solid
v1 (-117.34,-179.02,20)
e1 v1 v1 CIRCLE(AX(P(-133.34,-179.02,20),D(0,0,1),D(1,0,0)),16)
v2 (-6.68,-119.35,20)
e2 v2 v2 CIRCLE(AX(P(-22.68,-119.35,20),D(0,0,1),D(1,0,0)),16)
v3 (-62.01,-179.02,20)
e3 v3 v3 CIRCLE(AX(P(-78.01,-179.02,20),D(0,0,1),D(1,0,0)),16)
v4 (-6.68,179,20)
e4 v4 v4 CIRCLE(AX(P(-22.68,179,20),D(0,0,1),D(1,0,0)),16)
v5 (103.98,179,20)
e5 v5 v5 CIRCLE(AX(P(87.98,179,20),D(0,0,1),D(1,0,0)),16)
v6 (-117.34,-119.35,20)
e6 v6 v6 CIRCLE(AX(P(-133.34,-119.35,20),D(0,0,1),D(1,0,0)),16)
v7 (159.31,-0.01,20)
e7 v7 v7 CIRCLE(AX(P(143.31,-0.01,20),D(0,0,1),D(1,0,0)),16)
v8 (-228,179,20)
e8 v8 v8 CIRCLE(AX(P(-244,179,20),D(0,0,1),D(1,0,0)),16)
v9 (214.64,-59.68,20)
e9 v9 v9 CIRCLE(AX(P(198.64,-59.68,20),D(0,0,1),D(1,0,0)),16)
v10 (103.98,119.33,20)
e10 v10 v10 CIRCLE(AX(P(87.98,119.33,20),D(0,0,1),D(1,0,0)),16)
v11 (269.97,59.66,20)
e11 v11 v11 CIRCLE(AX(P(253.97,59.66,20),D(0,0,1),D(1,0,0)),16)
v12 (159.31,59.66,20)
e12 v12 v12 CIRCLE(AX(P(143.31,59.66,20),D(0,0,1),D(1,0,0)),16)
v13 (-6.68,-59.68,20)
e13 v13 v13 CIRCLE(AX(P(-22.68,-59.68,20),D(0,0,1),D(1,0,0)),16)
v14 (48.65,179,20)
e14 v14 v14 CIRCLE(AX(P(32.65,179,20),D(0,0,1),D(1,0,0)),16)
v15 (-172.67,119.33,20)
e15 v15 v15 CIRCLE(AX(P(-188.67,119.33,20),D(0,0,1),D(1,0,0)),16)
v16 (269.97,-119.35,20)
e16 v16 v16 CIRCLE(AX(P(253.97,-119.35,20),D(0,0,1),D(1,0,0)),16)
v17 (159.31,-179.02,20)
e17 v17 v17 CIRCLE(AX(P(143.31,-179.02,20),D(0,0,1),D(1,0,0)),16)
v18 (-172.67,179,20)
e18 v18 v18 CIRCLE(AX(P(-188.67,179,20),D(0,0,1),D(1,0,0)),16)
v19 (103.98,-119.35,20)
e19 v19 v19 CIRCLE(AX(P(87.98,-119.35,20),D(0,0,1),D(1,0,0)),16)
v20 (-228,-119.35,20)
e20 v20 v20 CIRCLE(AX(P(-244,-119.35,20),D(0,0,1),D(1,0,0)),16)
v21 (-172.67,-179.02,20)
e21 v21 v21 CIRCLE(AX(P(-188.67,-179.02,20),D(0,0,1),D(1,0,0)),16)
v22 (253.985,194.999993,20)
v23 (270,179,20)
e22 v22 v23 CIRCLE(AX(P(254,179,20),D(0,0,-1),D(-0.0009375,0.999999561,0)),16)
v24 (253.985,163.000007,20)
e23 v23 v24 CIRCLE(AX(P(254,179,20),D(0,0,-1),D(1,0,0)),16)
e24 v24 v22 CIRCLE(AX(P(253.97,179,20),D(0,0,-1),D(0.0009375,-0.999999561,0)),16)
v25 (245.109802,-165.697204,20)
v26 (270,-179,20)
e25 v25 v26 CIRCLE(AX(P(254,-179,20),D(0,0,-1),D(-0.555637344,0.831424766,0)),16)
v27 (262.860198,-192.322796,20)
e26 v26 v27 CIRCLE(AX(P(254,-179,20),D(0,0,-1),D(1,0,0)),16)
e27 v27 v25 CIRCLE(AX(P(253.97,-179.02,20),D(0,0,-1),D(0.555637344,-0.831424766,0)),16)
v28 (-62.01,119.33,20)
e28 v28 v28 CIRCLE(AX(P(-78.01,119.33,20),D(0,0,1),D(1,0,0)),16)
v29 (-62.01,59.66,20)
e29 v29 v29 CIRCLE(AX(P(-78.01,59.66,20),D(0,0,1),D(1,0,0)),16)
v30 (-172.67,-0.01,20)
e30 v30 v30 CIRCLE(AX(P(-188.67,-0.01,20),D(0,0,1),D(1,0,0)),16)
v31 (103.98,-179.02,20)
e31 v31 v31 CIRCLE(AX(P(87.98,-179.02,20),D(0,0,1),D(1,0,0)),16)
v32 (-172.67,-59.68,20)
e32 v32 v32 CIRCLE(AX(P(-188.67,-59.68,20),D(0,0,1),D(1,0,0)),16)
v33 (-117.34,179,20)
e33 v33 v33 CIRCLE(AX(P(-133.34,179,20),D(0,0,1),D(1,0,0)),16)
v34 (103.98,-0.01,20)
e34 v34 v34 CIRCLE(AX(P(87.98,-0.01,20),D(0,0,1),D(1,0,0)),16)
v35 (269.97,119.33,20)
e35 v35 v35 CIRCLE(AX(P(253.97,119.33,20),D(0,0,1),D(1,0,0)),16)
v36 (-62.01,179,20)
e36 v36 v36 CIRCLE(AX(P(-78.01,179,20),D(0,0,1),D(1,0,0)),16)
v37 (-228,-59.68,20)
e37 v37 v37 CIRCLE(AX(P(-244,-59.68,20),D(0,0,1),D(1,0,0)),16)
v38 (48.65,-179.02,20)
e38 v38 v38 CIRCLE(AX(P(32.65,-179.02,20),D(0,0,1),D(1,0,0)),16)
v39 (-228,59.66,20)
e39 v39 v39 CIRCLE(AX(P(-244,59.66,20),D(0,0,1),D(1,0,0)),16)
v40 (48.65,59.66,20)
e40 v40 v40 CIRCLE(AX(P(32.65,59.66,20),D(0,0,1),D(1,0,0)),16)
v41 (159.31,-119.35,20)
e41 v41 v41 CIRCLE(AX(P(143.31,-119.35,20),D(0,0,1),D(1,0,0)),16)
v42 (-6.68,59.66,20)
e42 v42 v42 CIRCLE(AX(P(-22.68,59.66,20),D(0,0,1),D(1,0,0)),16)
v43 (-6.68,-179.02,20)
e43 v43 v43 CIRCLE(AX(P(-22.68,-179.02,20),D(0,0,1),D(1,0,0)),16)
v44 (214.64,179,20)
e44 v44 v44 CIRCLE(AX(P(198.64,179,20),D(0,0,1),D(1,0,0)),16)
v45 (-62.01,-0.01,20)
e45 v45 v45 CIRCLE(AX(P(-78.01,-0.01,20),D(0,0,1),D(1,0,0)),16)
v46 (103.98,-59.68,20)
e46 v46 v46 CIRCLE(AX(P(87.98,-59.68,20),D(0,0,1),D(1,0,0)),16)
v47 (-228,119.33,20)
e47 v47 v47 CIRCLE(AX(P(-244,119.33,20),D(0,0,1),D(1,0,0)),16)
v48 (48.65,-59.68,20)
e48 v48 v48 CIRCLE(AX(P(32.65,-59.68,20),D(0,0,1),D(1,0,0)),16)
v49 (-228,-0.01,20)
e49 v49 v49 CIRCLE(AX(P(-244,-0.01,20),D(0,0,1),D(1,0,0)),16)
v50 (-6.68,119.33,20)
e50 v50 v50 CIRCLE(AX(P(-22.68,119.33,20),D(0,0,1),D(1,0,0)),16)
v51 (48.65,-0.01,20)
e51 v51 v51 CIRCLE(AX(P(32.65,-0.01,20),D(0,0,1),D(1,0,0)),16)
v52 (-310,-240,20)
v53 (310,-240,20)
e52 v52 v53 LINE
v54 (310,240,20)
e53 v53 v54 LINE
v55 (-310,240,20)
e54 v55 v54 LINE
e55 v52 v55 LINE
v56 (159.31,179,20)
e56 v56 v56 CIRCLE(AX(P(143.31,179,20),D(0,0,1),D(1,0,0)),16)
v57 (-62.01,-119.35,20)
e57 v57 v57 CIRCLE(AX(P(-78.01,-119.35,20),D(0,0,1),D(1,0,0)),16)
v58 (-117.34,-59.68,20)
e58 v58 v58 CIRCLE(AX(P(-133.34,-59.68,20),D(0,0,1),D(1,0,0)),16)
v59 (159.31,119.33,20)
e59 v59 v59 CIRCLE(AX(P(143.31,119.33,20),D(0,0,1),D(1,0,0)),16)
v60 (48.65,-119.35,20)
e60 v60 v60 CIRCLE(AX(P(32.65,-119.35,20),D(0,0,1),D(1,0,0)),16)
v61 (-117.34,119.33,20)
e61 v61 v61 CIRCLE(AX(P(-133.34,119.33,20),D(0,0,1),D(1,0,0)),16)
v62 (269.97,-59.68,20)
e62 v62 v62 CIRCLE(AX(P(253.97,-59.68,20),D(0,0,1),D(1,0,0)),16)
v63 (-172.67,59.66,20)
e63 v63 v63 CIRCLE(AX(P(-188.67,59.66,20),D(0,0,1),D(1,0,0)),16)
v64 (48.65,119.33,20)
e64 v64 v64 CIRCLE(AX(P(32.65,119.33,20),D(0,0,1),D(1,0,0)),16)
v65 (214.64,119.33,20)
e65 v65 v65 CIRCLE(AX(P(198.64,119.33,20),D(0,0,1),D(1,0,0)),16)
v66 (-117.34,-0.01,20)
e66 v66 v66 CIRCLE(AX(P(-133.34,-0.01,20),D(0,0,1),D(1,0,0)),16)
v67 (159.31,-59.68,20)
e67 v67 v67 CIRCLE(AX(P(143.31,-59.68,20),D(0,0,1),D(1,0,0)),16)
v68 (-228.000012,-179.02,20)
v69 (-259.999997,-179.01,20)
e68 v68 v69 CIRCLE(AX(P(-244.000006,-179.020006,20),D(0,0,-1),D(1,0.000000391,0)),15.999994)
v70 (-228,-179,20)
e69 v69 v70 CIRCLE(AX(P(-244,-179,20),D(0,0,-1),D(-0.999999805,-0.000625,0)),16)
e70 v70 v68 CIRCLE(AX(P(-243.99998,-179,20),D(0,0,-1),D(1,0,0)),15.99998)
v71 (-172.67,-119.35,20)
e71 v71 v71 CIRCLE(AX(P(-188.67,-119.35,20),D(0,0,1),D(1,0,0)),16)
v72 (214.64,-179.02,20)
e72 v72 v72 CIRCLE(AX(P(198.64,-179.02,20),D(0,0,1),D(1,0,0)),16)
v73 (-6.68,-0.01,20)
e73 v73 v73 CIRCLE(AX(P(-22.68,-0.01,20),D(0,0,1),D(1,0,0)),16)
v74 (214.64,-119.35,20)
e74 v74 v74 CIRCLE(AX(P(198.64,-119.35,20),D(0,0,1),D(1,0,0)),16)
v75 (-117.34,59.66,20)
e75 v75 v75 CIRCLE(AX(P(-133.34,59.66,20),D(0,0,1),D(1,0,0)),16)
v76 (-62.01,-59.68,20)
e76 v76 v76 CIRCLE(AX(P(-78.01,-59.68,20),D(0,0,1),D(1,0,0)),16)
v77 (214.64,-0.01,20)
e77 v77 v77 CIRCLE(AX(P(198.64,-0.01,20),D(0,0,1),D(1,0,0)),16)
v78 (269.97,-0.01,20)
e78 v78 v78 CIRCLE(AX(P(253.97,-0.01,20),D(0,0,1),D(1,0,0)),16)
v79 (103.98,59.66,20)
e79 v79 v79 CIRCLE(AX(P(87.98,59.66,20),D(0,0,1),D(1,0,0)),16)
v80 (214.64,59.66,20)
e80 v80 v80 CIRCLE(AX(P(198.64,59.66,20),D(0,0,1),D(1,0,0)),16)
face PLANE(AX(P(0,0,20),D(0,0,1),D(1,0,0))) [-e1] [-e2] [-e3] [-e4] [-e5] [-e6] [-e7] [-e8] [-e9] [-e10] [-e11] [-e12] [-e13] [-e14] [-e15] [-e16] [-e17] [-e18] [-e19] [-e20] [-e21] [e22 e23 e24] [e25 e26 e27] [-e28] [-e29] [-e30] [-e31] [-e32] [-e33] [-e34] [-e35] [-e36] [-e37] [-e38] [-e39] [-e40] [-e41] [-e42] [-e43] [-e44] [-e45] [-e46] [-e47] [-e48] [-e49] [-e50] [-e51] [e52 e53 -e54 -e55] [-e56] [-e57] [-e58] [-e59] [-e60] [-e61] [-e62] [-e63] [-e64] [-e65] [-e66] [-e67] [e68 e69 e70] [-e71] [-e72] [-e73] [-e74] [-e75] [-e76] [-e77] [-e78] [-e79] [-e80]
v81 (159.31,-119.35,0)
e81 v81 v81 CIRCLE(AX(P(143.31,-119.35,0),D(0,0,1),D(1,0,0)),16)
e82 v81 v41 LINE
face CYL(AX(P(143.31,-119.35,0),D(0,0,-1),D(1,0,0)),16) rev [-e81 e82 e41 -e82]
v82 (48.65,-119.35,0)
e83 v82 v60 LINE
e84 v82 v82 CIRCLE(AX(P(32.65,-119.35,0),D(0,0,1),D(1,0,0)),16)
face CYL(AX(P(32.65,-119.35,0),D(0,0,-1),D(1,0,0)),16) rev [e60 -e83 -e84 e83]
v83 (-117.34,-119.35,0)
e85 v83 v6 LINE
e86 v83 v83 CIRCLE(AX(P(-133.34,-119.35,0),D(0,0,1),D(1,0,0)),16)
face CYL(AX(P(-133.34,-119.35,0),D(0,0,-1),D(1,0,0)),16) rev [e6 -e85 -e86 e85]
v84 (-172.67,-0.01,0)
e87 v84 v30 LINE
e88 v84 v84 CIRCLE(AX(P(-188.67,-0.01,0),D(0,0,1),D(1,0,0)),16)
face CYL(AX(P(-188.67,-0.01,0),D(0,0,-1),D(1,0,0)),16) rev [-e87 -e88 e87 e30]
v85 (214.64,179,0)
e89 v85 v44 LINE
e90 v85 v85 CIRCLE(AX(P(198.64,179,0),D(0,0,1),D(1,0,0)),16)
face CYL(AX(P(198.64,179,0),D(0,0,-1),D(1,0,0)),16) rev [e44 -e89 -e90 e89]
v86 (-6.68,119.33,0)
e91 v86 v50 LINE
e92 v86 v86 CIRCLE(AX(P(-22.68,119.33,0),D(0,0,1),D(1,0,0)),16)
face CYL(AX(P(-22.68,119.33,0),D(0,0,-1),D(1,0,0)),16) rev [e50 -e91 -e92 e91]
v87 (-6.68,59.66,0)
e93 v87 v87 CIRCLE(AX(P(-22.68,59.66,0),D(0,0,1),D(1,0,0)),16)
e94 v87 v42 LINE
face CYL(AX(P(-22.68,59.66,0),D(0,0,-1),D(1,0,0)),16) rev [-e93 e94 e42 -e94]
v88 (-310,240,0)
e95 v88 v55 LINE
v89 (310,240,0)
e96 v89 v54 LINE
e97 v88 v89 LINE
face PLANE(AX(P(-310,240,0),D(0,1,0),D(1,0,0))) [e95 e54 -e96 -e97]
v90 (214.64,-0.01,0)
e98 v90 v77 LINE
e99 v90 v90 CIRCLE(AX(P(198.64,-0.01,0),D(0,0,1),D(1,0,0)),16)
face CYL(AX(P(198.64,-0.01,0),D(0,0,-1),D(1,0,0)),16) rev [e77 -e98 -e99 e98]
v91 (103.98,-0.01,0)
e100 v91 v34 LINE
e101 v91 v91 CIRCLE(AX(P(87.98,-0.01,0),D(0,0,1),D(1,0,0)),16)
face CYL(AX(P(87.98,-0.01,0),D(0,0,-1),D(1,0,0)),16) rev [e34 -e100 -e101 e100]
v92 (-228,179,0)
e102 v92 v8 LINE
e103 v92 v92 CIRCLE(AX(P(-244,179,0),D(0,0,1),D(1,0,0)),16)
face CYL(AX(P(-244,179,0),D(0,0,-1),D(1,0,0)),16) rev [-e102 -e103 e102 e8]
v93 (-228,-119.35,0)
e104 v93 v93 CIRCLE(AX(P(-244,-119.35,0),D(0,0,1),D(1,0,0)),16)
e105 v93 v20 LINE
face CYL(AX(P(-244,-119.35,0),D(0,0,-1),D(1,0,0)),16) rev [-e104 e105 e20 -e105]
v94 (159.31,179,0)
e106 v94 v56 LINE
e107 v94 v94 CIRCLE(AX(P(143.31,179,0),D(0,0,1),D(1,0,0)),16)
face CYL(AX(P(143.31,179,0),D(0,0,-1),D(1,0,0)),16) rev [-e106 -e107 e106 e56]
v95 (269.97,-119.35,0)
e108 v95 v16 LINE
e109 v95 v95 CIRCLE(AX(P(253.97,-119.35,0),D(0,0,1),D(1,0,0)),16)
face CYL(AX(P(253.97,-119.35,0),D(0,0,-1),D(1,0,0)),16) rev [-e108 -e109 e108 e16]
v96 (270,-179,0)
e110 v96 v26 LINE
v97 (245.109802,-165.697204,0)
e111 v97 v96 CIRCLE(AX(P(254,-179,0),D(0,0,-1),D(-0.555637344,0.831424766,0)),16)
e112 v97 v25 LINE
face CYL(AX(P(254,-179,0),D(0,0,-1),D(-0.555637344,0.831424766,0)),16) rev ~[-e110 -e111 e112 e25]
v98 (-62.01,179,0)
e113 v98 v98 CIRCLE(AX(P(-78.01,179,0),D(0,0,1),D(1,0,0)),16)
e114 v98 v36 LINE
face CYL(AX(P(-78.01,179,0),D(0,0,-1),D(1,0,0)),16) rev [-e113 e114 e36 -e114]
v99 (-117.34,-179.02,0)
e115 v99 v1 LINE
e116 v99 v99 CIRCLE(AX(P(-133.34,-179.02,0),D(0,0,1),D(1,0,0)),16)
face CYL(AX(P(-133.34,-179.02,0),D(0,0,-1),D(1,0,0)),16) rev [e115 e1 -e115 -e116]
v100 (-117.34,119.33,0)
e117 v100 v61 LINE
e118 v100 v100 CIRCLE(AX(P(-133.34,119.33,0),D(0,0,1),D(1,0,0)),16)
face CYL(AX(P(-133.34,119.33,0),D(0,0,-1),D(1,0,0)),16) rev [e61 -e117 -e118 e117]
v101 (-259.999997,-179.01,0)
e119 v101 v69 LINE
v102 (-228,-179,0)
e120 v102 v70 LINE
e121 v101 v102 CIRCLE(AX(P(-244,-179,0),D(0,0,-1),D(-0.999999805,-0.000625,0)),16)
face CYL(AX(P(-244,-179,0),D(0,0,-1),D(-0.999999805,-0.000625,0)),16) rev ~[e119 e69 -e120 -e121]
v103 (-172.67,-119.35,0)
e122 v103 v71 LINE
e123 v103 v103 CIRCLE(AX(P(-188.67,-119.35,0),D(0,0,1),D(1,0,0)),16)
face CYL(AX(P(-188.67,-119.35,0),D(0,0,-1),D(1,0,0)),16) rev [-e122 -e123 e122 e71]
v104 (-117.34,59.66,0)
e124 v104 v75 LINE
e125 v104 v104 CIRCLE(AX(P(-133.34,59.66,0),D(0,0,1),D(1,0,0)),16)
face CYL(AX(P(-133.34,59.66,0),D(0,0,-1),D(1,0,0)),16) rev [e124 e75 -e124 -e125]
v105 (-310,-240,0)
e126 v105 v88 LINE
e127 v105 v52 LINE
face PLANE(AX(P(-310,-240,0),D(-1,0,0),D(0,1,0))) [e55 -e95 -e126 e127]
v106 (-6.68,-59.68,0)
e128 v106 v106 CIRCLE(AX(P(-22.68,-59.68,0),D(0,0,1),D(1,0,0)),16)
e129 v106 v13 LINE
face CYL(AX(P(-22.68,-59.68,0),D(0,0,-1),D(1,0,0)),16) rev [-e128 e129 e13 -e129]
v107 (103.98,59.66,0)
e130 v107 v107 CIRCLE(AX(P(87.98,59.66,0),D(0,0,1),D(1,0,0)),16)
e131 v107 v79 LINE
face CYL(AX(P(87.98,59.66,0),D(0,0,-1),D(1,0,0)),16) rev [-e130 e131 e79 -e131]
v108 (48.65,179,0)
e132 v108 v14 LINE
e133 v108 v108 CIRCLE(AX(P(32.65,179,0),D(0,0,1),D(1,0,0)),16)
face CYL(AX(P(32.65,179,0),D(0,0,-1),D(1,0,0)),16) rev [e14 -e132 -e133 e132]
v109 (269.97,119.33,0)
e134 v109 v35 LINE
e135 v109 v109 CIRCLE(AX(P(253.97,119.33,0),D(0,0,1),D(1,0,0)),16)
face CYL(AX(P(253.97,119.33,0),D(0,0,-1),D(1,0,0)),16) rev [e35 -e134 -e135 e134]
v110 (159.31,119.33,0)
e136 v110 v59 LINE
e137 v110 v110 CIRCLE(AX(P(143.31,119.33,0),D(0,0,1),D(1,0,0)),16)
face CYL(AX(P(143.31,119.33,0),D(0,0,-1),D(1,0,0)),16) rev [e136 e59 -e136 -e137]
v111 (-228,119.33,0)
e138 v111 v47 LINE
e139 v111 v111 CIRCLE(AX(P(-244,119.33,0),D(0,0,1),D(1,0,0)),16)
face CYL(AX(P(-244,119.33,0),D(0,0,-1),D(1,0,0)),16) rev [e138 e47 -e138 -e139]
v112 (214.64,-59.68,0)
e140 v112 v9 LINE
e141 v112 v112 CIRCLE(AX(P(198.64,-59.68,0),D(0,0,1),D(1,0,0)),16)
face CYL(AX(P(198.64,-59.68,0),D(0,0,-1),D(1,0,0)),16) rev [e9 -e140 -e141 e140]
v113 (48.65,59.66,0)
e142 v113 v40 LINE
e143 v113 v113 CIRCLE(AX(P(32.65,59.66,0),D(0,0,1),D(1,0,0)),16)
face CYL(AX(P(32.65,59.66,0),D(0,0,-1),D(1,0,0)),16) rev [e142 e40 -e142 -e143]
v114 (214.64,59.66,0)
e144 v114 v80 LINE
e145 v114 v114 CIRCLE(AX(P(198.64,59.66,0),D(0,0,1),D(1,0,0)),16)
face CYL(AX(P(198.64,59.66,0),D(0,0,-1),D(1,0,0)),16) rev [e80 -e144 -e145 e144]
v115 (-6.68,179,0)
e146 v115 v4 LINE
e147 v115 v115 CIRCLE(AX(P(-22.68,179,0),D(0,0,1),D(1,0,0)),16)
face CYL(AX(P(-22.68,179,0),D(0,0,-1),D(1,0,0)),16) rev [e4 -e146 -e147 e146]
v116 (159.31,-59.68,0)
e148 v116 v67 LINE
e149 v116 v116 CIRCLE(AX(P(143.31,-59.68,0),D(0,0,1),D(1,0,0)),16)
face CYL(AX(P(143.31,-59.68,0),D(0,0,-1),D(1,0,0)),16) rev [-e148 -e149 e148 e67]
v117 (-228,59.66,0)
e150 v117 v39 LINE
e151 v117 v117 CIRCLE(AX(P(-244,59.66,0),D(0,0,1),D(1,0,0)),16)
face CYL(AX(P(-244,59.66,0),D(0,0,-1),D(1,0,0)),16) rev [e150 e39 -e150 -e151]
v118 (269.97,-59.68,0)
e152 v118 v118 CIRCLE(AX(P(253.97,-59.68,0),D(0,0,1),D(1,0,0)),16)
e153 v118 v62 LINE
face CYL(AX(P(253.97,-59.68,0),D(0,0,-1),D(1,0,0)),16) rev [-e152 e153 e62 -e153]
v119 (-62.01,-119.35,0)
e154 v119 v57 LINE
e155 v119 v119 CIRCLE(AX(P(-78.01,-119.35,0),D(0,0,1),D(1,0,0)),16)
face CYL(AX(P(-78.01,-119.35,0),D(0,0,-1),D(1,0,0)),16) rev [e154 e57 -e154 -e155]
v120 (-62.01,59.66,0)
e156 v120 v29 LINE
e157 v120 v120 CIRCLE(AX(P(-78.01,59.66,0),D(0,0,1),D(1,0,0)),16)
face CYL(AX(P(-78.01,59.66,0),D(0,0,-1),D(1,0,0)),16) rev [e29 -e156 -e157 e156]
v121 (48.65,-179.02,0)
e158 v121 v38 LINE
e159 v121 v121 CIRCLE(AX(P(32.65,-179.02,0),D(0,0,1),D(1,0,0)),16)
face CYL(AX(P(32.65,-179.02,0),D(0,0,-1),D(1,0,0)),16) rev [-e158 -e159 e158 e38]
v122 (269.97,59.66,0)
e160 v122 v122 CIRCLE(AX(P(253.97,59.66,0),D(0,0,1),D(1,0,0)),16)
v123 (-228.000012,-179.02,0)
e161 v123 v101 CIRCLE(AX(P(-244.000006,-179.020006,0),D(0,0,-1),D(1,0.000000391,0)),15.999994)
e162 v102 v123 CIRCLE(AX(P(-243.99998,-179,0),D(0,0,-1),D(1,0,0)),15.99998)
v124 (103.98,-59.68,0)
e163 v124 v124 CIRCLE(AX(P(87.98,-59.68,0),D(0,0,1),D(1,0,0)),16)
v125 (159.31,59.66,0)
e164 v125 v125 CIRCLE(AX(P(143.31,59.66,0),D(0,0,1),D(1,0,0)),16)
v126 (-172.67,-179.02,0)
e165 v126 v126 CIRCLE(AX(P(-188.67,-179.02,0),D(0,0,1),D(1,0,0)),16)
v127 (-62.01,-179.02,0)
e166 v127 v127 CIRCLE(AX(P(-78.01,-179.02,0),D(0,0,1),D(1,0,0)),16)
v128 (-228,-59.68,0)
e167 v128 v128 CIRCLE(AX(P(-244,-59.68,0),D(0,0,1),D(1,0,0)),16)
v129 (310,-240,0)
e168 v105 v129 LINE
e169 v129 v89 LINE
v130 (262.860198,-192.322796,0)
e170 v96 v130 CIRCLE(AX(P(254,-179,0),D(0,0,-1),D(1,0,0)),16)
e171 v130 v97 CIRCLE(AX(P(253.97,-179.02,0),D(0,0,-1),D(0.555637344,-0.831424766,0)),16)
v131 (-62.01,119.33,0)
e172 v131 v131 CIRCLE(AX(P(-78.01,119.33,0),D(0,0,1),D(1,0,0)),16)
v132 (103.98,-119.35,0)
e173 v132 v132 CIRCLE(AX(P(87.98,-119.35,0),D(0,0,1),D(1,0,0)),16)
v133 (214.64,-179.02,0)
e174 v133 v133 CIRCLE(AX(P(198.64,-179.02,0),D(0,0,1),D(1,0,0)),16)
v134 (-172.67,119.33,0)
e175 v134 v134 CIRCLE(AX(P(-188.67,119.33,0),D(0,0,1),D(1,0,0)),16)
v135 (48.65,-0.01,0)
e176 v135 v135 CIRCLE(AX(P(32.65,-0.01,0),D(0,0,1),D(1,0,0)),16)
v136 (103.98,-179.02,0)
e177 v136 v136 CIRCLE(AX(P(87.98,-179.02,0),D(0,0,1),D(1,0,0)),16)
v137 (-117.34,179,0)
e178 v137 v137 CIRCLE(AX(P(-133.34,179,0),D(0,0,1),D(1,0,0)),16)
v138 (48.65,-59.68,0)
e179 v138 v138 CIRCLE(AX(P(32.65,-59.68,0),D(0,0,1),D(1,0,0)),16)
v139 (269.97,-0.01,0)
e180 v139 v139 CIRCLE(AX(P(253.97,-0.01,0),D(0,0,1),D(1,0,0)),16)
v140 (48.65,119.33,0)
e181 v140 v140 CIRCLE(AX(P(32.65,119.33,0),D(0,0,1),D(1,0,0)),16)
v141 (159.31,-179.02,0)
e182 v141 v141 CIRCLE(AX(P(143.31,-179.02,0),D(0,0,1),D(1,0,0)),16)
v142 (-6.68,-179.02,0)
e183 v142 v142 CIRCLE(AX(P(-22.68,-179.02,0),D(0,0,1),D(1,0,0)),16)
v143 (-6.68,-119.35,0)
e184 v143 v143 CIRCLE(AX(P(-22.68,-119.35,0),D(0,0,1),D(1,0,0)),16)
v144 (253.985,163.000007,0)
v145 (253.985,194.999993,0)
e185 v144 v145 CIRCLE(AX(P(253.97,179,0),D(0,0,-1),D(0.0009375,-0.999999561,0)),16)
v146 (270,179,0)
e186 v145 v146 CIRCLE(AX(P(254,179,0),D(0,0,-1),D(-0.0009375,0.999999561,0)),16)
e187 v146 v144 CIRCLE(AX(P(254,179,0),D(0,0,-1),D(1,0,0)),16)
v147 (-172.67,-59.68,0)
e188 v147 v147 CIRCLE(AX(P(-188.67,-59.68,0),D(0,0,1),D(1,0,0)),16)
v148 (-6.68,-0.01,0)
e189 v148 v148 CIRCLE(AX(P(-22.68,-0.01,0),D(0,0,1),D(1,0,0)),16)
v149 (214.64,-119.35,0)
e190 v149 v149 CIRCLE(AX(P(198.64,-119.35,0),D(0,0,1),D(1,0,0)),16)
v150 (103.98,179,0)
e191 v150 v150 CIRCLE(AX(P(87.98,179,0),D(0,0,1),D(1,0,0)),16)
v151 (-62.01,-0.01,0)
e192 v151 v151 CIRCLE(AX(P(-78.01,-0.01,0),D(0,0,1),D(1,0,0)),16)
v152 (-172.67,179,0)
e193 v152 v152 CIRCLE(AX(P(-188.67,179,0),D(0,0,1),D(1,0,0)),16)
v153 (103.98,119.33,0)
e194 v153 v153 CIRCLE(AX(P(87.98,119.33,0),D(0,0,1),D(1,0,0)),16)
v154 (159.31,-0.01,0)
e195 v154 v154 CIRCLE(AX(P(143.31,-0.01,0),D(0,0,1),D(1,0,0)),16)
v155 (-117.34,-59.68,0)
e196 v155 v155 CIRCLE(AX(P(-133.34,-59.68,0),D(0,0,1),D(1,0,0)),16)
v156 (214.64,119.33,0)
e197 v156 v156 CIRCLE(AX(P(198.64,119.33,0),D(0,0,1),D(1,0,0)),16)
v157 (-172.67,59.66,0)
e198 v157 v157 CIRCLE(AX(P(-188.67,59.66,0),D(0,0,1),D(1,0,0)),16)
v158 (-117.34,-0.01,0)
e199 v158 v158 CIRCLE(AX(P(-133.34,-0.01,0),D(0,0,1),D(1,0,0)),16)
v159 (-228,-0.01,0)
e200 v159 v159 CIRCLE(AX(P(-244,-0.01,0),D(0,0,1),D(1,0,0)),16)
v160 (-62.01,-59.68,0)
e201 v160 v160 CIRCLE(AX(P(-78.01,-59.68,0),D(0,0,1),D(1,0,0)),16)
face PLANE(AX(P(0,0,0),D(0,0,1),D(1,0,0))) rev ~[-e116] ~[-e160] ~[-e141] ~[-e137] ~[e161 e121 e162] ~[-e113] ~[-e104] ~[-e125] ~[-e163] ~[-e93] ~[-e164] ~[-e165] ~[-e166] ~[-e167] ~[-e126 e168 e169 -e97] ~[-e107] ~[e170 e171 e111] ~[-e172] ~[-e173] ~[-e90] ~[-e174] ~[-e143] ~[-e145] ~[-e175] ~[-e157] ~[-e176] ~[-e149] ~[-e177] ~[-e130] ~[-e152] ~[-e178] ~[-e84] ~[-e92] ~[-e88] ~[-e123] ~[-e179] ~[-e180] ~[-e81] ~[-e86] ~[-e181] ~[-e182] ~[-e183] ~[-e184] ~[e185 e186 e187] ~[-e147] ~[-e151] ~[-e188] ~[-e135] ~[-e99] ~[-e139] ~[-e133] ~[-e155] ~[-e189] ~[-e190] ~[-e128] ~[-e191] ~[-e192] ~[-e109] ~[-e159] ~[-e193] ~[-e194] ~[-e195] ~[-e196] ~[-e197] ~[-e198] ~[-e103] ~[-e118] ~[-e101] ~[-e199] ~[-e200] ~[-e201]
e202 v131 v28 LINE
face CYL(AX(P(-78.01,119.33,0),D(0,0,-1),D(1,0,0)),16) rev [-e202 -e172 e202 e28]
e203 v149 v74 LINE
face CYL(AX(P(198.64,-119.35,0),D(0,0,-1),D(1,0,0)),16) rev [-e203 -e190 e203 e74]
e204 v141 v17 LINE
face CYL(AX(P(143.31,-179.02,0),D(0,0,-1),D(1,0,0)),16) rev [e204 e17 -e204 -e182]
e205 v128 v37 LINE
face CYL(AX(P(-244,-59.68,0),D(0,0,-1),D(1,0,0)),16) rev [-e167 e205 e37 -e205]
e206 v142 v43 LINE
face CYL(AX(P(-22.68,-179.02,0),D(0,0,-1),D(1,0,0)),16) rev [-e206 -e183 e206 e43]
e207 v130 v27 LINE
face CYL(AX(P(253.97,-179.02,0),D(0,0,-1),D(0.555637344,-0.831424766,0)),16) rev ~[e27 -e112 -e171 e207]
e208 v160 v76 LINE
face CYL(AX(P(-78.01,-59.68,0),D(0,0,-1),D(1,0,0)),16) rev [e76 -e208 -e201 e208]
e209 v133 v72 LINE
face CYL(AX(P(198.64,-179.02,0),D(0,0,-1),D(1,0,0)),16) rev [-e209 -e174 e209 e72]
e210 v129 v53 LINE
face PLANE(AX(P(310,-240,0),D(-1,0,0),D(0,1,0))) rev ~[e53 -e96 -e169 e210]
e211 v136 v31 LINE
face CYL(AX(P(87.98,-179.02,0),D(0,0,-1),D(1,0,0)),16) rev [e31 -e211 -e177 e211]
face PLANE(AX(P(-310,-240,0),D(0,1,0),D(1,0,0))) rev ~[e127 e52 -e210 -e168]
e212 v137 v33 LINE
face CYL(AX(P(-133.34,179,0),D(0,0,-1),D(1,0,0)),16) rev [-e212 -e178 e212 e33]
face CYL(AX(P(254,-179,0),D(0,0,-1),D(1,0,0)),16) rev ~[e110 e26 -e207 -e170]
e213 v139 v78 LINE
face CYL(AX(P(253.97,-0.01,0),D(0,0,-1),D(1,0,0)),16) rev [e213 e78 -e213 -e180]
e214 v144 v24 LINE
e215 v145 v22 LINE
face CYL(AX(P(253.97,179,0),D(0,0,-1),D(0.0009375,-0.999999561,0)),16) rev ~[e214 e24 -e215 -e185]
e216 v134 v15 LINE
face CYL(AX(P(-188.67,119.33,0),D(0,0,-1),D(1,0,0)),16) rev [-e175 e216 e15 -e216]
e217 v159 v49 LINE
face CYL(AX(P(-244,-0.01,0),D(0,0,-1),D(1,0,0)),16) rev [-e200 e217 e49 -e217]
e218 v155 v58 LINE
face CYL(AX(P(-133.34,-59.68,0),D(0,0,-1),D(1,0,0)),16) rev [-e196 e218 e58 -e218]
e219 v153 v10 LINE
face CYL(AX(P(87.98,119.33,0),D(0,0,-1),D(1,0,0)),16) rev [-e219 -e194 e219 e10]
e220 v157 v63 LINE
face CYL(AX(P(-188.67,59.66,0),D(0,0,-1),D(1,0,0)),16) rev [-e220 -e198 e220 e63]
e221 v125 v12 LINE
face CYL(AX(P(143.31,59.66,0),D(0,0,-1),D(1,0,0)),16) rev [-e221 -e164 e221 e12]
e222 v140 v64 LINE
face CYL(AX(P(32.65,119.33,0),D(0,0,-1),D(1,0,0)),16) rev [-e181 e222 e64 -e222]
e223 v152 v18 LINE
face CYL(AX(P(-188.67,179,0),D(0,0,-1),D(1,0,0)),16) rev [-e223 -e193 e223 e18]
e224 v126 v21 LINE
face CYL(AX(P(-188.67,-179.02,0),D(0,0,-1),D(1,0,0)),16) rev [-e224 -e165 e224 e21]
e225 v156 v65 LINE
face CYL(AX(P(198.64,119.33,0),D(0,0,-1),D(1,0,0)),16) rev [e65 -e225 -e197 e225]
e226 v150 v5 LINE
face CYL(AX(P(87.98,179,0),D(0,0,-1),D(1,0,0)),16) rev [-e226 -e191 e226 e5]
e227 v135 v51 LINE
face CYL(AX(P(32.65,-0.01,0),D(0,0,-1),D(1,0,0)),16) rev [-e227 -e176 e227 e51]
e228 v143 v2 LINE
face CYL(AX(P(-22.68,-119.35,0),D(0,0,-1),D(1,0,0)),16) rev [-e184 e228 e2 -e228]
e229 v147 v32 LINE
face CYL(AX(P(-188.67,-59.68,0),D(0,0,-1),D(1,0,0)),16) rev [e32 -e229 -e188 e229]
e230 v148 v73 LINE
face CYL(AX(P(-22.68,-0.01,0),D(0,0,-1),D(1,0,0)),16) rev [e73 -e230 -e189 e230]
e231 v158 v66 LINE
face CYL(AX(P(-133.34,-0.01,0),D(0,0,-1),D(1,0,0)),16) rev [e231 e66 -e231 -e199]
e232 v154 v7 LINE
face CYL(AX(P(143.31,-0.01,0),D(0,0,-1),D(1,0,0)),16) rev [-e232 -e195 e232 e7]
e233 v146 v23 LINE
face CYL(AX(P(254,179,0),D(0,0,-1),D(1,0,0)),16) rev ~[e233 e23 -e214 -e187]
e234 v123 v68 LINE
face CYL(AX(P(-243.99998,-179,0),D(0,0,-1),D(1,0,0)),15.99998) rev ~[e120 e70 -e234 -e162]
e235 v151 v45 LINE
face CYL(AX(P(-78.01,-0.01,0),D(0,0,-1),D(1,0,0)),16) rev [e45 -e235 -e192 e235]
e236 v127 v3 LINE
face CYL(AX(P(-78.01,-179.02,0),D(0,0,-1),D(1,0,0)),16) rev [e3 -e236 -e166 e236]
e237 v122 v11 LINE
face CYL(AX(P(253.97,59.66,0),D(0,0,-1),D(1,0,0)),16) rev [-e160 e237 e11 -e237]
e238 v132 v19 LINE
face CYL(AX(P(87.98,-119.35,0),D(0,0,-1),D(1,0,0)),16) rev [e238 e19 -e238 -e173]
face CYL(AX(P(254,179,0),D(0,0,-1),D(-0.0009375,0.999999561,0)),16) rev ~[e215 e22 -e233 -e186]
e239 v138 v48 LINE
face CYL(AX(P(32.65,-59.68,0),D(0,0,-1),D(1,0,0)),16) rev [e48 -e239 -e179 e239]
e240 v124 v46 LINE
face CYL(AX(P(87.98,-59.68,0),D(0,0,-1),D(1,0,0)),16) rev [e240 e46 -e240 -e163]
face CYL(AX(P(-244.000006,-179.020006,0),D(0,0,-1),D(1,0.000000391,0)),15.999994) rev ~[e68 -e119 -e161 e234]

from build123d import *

# Parameters (mm, degrees)
F0_W     = 620
F0_H     = 480
F0_R     = 16
F1_DEPTH = 20


# Not quite as in the source:
# - ends of sketch curves that miss each other by under 0.0002 mm in the source are joined


with BuildPart() as f1:
    # F0 (on Top) → F1 (new body)
    with BuildSketch(Plane.XY):
        Rectangle(F0_W, F0_H)
        with BuildLine():
            ThreePointArc((-228, -179), (-228.000003125, -179.0099999941), (-228.0000125, -179.0199999844))
            ThreePointArc((-228.0000125, -179.0199999844), (-244.0050000002, -195.0199992187), (-259.999996875, -179.01))
            ThreePointArc((-259.999996875, -179.01), (-244.0050000002, -163.0000007813), (-228, -179))
        make_face(mode=Mode.SUBTRACT)
        with Locations((-188.67, -179.02)):
            Circle(F0_R, mode=Mode.SUBTRACT)
        with Locations((-133.34, -179.02)):
            Circle(F0_R, mode=Mode.SUBTRACT)
        with Locations((-78.01, -179.02)):
            Circle(F0_R, mode=Mode.SUBTRACT)
        with Locations((-22.68, -179.02)):
            Circle(F0_R, mode=Mode.SUBTRACT)
        with Locations((-244, -119.35)):
            Circle(F0_R, mode=Mode.SUBTRACT)
        with Locations((-188.67, -119.35)):
            Circle(F0_R, mode=Mode.SUBTRACT)
        with Locations((-244, -59.68)):
            Circle(F0_R, mode=Mode.SUBTRACT)
        with Locations((-244, -0.01)):
            Circle(F0_R, mode=Mode.SUBTRACT)
        with Locations((-188.67, -59.68)):
            Circle(F0_R, mode=Mode.SUBTRACT)
        with Locations((-188.67, -0.01)):
            Circle(F0_R, mode=Mode.SUBTRACT)
        with Locations((-133.34, -119.35)):
            Circle(F0_R, mode=Mode.SUBTRACT)
        with Locations((-78.01, -119.35)):
            Circle(F0_R, mode=Mode.SUBTRACT)
        with Locations((-22.68, -119.35)):
            Circle(F0_R, mode=Mode.SUBTRACT)
        with Locations((-133.34, -59.68)):
            Circle(F0_R, mode=Mode.SUBTRACT)
        with Locations((-78.01, -59.68)):
            Circle(F0_R, mode=Mode.SUBTRACT)
        with Locations((-133.34, -0.01)):
            Circle(F0_R, mode=Mode.SUBTRACT)
        with Locations((-78.01, -0.01)):
            Circle(F0_R, mode=Mode.SUBTRACT)
        with Locations((-22.68, -59.68)):
            Circle(F0_R, mode=Mode.SUBTRACT)
        with Locations((-22.68, -0.01)):
            Circle(F0_R, mode=Mode.SUBTRACT)
        with Locations((32.65, -179.02)):
            Circle(F0_R, mode=Mode.SUBTRACT)
        with Locations((87.98, -179.02)):
            Circle(F0_R, mode=Mode.SUBTRACT)
        with Locations((143.31, -179.02)):
            Circle(F0_R, mode=Mode.SUBTRACT)
        with Locations((198.64, -179.02)):
            Circle(F0_R, mode=Mode.SUBTRACT)
        with BuildLine():
            ThreePointArc((245.1098024941, -165.6972037411), (261.5417783017, -164.8889553878), (270, -179))
            ThreePointArc((270, -179), (268.1025380711, -186.5576729191), (262.8601975059, -192.3227962589))
            ThreePointArc((262.8601975059, -192.3227962589), (240.6571952906, -187.8952031396), (245.1098024941, -165.6972037411))
        make_face(mode=Mode.SUBTRACT)
        with Locations((32.65, -119.35)):
            Circle(F0_R, mode=Mode.SUBTRACT)
        with Locations((87.98, -119.35)):
            Circle(F0_R, mode=Mode.SUBTRACT)
        with Locations((143.31, -119.35)):
            Circle(F0_R, mode=Mode.SUBTRACT)
        with Locations((32.65, -59.68)):
            Circle(F0_R, mode=Mode.SUBTRACT)
        with Locations((32.65, -0.01)):
            Circle(F0_R, mode=Mode.SUBTRACT)
        with Locations((87.98, -59.68)):
            Circle(F0_R, mode=Mode.SUBTRACT)
        with Locations((143.31, -59.68)):
            Circle(F0_R, mode=Mode.SUBTRACT)
        with Locations((87.98, -0.01)):
            Circle(F0_R, mode=Mode.SUBTRACT)
        with Locations((143.31, -0.01)):
            Circle(F0_R, mode=Mode.SUBTRACT)
        with Locations((198.64, -119.35)):
            Circle(F0_R, mode=Mode.SUBTRACT)
        with Locations((253.97, -119.35)):
            Circle(F0_R, mode=Mode.SUBTRACT)
        with Locations((198.64, -59.68)):
            Circle(F0_R, mode=Mode.SUBTRACT)
        with Locations((198.64, -0.01)):
            Circle(F0_R, mode=Mode.SUBTRACT)
        with Locations((253.97, -59.68)):
            Circle(F0_R, mode=Mode.SUBTRACT)
        with Locations((253.97, -0.01)):
            Circle(F0_R, mode=Mode.SUBTRACT)
        with Locations((-244, 59.66)):
            Circle(F0_R, mode=Mode.SUBTRACT)
        with Locations((-188.67, 59.66)):
            Circle(F0_R, mode=Mode.SUBTRACT)
        with Locations((-244, 119.33)):
            Circle(F0_R, mode=Mode.SUBTRACT)
        with Locations((-188.67, 119.33)):
            Circle(F0_R, mode=Mode.SUBTRACT)
        with Locations((-133.34, 59.66)):
            Circle(F0_R, mode=Mode.SUBTRACT)
        with Locations((-78.01, 59.66)):
            Circle(F0_R, mode=Mode.SUBTRACT)
        with Locations((-22.68, 59.66)):
            Circle(F0_R, mode=Mode.SUBTRACT)
        with Locations((-133.34, 119.33)):
            Circle(F0_R, mode=Mode.SUBTRACT)
        with Locations((-78.01, 119.33)):
            Circle(F0_R, mode=Mode.SUBTRACT)
        with Locations((-22.68, 119.33)):
            Circle(F0_R, mode=Mode.SUBTRACT)
        with Locations((-244, 179)):
            Circle(F0_R, mode=Mode.SUBTRACT)
        with Locations((-188.67, 179)):
            Circle(F0_R, mode=Mode.SUBTRACT)
        with Locations((-133.34, 179)):
            Circle(F0_R, mode=Mode.SUBTRACT)
        with Locations((-78.01, 179)):
            Circle(F0_R, mode=Mode.SUBTRACT)
        with Locations((-22.68, 179)):
            Circle(F0_R, mode=Mode.SUBTRACT)
        with Locations((32.65, 59.66)):
            Circle(F0_R, mode=Mode.SUBTRACT)
        with Locations((87.98, 59.66)):
            Circle(F0_R, mode=Mode.SUBTRACT)
        with Locations((143.31, 59.66)):
            Circle(F0_R, mode=Mode.SUBTRACT)
        with Locations((32.65, 119.33)):
            Circle(F0_R, mode=Mode.SUBTRACT)
        with Locations((87.98, 119.33)):
            Circle(F0_R, mode=Mode.SUBTRACT)
        with Locations((143.31, 119.33)):
            Circle(F0_R, mode=Mode.SUBTRACT)
        with Locations((198.64, 59.66)):
            Circle(F0_R, mode=Mode.SUBTRACT)
        with Locations((253.97, 59.66)):
            Circle(F0_R, mode=Mode.SUBTRACT)
        with Locations((198.64, 119.33)):
            Circle(F0_R, mode=Mode.SUBTRACT)
        with Locations((253.97, 119.33)):
            Circle(F0_R, mode=Mode.SUBTRACT)
        with Locations((32.65, 179)):
            Circle(F0_R, mode=Mode.SUBTRACT)
        with Locations((87.98, 179)):
            Circle(F0_R, mode=Mode.SUBTRACT)
        with Locations((143.31, 179)):
            Circle(F0_R, mode=Mode.SUBTRACT)
        with Locations((198.64, 179)):
            Circle(F0_R, mode=Mode.SUBTRACT)
        with BuildLine():
            ThreePointArc((253.985, 194.9999929687), (265.3084039546, 190.3190105575), (270, 179))
            ThreePointArc((270, 179), (265.3084039546, 167.6809894425), (253.985, 163.0000070313))
            ThreePointArc((253.985, 163.0000070313), (237.97, 179), (253.985, 194.9999929687))
        make_face(mode=Mode.SUBTRACT)
    extrude(amount=F1_DEPTH)


solid = f1.part
